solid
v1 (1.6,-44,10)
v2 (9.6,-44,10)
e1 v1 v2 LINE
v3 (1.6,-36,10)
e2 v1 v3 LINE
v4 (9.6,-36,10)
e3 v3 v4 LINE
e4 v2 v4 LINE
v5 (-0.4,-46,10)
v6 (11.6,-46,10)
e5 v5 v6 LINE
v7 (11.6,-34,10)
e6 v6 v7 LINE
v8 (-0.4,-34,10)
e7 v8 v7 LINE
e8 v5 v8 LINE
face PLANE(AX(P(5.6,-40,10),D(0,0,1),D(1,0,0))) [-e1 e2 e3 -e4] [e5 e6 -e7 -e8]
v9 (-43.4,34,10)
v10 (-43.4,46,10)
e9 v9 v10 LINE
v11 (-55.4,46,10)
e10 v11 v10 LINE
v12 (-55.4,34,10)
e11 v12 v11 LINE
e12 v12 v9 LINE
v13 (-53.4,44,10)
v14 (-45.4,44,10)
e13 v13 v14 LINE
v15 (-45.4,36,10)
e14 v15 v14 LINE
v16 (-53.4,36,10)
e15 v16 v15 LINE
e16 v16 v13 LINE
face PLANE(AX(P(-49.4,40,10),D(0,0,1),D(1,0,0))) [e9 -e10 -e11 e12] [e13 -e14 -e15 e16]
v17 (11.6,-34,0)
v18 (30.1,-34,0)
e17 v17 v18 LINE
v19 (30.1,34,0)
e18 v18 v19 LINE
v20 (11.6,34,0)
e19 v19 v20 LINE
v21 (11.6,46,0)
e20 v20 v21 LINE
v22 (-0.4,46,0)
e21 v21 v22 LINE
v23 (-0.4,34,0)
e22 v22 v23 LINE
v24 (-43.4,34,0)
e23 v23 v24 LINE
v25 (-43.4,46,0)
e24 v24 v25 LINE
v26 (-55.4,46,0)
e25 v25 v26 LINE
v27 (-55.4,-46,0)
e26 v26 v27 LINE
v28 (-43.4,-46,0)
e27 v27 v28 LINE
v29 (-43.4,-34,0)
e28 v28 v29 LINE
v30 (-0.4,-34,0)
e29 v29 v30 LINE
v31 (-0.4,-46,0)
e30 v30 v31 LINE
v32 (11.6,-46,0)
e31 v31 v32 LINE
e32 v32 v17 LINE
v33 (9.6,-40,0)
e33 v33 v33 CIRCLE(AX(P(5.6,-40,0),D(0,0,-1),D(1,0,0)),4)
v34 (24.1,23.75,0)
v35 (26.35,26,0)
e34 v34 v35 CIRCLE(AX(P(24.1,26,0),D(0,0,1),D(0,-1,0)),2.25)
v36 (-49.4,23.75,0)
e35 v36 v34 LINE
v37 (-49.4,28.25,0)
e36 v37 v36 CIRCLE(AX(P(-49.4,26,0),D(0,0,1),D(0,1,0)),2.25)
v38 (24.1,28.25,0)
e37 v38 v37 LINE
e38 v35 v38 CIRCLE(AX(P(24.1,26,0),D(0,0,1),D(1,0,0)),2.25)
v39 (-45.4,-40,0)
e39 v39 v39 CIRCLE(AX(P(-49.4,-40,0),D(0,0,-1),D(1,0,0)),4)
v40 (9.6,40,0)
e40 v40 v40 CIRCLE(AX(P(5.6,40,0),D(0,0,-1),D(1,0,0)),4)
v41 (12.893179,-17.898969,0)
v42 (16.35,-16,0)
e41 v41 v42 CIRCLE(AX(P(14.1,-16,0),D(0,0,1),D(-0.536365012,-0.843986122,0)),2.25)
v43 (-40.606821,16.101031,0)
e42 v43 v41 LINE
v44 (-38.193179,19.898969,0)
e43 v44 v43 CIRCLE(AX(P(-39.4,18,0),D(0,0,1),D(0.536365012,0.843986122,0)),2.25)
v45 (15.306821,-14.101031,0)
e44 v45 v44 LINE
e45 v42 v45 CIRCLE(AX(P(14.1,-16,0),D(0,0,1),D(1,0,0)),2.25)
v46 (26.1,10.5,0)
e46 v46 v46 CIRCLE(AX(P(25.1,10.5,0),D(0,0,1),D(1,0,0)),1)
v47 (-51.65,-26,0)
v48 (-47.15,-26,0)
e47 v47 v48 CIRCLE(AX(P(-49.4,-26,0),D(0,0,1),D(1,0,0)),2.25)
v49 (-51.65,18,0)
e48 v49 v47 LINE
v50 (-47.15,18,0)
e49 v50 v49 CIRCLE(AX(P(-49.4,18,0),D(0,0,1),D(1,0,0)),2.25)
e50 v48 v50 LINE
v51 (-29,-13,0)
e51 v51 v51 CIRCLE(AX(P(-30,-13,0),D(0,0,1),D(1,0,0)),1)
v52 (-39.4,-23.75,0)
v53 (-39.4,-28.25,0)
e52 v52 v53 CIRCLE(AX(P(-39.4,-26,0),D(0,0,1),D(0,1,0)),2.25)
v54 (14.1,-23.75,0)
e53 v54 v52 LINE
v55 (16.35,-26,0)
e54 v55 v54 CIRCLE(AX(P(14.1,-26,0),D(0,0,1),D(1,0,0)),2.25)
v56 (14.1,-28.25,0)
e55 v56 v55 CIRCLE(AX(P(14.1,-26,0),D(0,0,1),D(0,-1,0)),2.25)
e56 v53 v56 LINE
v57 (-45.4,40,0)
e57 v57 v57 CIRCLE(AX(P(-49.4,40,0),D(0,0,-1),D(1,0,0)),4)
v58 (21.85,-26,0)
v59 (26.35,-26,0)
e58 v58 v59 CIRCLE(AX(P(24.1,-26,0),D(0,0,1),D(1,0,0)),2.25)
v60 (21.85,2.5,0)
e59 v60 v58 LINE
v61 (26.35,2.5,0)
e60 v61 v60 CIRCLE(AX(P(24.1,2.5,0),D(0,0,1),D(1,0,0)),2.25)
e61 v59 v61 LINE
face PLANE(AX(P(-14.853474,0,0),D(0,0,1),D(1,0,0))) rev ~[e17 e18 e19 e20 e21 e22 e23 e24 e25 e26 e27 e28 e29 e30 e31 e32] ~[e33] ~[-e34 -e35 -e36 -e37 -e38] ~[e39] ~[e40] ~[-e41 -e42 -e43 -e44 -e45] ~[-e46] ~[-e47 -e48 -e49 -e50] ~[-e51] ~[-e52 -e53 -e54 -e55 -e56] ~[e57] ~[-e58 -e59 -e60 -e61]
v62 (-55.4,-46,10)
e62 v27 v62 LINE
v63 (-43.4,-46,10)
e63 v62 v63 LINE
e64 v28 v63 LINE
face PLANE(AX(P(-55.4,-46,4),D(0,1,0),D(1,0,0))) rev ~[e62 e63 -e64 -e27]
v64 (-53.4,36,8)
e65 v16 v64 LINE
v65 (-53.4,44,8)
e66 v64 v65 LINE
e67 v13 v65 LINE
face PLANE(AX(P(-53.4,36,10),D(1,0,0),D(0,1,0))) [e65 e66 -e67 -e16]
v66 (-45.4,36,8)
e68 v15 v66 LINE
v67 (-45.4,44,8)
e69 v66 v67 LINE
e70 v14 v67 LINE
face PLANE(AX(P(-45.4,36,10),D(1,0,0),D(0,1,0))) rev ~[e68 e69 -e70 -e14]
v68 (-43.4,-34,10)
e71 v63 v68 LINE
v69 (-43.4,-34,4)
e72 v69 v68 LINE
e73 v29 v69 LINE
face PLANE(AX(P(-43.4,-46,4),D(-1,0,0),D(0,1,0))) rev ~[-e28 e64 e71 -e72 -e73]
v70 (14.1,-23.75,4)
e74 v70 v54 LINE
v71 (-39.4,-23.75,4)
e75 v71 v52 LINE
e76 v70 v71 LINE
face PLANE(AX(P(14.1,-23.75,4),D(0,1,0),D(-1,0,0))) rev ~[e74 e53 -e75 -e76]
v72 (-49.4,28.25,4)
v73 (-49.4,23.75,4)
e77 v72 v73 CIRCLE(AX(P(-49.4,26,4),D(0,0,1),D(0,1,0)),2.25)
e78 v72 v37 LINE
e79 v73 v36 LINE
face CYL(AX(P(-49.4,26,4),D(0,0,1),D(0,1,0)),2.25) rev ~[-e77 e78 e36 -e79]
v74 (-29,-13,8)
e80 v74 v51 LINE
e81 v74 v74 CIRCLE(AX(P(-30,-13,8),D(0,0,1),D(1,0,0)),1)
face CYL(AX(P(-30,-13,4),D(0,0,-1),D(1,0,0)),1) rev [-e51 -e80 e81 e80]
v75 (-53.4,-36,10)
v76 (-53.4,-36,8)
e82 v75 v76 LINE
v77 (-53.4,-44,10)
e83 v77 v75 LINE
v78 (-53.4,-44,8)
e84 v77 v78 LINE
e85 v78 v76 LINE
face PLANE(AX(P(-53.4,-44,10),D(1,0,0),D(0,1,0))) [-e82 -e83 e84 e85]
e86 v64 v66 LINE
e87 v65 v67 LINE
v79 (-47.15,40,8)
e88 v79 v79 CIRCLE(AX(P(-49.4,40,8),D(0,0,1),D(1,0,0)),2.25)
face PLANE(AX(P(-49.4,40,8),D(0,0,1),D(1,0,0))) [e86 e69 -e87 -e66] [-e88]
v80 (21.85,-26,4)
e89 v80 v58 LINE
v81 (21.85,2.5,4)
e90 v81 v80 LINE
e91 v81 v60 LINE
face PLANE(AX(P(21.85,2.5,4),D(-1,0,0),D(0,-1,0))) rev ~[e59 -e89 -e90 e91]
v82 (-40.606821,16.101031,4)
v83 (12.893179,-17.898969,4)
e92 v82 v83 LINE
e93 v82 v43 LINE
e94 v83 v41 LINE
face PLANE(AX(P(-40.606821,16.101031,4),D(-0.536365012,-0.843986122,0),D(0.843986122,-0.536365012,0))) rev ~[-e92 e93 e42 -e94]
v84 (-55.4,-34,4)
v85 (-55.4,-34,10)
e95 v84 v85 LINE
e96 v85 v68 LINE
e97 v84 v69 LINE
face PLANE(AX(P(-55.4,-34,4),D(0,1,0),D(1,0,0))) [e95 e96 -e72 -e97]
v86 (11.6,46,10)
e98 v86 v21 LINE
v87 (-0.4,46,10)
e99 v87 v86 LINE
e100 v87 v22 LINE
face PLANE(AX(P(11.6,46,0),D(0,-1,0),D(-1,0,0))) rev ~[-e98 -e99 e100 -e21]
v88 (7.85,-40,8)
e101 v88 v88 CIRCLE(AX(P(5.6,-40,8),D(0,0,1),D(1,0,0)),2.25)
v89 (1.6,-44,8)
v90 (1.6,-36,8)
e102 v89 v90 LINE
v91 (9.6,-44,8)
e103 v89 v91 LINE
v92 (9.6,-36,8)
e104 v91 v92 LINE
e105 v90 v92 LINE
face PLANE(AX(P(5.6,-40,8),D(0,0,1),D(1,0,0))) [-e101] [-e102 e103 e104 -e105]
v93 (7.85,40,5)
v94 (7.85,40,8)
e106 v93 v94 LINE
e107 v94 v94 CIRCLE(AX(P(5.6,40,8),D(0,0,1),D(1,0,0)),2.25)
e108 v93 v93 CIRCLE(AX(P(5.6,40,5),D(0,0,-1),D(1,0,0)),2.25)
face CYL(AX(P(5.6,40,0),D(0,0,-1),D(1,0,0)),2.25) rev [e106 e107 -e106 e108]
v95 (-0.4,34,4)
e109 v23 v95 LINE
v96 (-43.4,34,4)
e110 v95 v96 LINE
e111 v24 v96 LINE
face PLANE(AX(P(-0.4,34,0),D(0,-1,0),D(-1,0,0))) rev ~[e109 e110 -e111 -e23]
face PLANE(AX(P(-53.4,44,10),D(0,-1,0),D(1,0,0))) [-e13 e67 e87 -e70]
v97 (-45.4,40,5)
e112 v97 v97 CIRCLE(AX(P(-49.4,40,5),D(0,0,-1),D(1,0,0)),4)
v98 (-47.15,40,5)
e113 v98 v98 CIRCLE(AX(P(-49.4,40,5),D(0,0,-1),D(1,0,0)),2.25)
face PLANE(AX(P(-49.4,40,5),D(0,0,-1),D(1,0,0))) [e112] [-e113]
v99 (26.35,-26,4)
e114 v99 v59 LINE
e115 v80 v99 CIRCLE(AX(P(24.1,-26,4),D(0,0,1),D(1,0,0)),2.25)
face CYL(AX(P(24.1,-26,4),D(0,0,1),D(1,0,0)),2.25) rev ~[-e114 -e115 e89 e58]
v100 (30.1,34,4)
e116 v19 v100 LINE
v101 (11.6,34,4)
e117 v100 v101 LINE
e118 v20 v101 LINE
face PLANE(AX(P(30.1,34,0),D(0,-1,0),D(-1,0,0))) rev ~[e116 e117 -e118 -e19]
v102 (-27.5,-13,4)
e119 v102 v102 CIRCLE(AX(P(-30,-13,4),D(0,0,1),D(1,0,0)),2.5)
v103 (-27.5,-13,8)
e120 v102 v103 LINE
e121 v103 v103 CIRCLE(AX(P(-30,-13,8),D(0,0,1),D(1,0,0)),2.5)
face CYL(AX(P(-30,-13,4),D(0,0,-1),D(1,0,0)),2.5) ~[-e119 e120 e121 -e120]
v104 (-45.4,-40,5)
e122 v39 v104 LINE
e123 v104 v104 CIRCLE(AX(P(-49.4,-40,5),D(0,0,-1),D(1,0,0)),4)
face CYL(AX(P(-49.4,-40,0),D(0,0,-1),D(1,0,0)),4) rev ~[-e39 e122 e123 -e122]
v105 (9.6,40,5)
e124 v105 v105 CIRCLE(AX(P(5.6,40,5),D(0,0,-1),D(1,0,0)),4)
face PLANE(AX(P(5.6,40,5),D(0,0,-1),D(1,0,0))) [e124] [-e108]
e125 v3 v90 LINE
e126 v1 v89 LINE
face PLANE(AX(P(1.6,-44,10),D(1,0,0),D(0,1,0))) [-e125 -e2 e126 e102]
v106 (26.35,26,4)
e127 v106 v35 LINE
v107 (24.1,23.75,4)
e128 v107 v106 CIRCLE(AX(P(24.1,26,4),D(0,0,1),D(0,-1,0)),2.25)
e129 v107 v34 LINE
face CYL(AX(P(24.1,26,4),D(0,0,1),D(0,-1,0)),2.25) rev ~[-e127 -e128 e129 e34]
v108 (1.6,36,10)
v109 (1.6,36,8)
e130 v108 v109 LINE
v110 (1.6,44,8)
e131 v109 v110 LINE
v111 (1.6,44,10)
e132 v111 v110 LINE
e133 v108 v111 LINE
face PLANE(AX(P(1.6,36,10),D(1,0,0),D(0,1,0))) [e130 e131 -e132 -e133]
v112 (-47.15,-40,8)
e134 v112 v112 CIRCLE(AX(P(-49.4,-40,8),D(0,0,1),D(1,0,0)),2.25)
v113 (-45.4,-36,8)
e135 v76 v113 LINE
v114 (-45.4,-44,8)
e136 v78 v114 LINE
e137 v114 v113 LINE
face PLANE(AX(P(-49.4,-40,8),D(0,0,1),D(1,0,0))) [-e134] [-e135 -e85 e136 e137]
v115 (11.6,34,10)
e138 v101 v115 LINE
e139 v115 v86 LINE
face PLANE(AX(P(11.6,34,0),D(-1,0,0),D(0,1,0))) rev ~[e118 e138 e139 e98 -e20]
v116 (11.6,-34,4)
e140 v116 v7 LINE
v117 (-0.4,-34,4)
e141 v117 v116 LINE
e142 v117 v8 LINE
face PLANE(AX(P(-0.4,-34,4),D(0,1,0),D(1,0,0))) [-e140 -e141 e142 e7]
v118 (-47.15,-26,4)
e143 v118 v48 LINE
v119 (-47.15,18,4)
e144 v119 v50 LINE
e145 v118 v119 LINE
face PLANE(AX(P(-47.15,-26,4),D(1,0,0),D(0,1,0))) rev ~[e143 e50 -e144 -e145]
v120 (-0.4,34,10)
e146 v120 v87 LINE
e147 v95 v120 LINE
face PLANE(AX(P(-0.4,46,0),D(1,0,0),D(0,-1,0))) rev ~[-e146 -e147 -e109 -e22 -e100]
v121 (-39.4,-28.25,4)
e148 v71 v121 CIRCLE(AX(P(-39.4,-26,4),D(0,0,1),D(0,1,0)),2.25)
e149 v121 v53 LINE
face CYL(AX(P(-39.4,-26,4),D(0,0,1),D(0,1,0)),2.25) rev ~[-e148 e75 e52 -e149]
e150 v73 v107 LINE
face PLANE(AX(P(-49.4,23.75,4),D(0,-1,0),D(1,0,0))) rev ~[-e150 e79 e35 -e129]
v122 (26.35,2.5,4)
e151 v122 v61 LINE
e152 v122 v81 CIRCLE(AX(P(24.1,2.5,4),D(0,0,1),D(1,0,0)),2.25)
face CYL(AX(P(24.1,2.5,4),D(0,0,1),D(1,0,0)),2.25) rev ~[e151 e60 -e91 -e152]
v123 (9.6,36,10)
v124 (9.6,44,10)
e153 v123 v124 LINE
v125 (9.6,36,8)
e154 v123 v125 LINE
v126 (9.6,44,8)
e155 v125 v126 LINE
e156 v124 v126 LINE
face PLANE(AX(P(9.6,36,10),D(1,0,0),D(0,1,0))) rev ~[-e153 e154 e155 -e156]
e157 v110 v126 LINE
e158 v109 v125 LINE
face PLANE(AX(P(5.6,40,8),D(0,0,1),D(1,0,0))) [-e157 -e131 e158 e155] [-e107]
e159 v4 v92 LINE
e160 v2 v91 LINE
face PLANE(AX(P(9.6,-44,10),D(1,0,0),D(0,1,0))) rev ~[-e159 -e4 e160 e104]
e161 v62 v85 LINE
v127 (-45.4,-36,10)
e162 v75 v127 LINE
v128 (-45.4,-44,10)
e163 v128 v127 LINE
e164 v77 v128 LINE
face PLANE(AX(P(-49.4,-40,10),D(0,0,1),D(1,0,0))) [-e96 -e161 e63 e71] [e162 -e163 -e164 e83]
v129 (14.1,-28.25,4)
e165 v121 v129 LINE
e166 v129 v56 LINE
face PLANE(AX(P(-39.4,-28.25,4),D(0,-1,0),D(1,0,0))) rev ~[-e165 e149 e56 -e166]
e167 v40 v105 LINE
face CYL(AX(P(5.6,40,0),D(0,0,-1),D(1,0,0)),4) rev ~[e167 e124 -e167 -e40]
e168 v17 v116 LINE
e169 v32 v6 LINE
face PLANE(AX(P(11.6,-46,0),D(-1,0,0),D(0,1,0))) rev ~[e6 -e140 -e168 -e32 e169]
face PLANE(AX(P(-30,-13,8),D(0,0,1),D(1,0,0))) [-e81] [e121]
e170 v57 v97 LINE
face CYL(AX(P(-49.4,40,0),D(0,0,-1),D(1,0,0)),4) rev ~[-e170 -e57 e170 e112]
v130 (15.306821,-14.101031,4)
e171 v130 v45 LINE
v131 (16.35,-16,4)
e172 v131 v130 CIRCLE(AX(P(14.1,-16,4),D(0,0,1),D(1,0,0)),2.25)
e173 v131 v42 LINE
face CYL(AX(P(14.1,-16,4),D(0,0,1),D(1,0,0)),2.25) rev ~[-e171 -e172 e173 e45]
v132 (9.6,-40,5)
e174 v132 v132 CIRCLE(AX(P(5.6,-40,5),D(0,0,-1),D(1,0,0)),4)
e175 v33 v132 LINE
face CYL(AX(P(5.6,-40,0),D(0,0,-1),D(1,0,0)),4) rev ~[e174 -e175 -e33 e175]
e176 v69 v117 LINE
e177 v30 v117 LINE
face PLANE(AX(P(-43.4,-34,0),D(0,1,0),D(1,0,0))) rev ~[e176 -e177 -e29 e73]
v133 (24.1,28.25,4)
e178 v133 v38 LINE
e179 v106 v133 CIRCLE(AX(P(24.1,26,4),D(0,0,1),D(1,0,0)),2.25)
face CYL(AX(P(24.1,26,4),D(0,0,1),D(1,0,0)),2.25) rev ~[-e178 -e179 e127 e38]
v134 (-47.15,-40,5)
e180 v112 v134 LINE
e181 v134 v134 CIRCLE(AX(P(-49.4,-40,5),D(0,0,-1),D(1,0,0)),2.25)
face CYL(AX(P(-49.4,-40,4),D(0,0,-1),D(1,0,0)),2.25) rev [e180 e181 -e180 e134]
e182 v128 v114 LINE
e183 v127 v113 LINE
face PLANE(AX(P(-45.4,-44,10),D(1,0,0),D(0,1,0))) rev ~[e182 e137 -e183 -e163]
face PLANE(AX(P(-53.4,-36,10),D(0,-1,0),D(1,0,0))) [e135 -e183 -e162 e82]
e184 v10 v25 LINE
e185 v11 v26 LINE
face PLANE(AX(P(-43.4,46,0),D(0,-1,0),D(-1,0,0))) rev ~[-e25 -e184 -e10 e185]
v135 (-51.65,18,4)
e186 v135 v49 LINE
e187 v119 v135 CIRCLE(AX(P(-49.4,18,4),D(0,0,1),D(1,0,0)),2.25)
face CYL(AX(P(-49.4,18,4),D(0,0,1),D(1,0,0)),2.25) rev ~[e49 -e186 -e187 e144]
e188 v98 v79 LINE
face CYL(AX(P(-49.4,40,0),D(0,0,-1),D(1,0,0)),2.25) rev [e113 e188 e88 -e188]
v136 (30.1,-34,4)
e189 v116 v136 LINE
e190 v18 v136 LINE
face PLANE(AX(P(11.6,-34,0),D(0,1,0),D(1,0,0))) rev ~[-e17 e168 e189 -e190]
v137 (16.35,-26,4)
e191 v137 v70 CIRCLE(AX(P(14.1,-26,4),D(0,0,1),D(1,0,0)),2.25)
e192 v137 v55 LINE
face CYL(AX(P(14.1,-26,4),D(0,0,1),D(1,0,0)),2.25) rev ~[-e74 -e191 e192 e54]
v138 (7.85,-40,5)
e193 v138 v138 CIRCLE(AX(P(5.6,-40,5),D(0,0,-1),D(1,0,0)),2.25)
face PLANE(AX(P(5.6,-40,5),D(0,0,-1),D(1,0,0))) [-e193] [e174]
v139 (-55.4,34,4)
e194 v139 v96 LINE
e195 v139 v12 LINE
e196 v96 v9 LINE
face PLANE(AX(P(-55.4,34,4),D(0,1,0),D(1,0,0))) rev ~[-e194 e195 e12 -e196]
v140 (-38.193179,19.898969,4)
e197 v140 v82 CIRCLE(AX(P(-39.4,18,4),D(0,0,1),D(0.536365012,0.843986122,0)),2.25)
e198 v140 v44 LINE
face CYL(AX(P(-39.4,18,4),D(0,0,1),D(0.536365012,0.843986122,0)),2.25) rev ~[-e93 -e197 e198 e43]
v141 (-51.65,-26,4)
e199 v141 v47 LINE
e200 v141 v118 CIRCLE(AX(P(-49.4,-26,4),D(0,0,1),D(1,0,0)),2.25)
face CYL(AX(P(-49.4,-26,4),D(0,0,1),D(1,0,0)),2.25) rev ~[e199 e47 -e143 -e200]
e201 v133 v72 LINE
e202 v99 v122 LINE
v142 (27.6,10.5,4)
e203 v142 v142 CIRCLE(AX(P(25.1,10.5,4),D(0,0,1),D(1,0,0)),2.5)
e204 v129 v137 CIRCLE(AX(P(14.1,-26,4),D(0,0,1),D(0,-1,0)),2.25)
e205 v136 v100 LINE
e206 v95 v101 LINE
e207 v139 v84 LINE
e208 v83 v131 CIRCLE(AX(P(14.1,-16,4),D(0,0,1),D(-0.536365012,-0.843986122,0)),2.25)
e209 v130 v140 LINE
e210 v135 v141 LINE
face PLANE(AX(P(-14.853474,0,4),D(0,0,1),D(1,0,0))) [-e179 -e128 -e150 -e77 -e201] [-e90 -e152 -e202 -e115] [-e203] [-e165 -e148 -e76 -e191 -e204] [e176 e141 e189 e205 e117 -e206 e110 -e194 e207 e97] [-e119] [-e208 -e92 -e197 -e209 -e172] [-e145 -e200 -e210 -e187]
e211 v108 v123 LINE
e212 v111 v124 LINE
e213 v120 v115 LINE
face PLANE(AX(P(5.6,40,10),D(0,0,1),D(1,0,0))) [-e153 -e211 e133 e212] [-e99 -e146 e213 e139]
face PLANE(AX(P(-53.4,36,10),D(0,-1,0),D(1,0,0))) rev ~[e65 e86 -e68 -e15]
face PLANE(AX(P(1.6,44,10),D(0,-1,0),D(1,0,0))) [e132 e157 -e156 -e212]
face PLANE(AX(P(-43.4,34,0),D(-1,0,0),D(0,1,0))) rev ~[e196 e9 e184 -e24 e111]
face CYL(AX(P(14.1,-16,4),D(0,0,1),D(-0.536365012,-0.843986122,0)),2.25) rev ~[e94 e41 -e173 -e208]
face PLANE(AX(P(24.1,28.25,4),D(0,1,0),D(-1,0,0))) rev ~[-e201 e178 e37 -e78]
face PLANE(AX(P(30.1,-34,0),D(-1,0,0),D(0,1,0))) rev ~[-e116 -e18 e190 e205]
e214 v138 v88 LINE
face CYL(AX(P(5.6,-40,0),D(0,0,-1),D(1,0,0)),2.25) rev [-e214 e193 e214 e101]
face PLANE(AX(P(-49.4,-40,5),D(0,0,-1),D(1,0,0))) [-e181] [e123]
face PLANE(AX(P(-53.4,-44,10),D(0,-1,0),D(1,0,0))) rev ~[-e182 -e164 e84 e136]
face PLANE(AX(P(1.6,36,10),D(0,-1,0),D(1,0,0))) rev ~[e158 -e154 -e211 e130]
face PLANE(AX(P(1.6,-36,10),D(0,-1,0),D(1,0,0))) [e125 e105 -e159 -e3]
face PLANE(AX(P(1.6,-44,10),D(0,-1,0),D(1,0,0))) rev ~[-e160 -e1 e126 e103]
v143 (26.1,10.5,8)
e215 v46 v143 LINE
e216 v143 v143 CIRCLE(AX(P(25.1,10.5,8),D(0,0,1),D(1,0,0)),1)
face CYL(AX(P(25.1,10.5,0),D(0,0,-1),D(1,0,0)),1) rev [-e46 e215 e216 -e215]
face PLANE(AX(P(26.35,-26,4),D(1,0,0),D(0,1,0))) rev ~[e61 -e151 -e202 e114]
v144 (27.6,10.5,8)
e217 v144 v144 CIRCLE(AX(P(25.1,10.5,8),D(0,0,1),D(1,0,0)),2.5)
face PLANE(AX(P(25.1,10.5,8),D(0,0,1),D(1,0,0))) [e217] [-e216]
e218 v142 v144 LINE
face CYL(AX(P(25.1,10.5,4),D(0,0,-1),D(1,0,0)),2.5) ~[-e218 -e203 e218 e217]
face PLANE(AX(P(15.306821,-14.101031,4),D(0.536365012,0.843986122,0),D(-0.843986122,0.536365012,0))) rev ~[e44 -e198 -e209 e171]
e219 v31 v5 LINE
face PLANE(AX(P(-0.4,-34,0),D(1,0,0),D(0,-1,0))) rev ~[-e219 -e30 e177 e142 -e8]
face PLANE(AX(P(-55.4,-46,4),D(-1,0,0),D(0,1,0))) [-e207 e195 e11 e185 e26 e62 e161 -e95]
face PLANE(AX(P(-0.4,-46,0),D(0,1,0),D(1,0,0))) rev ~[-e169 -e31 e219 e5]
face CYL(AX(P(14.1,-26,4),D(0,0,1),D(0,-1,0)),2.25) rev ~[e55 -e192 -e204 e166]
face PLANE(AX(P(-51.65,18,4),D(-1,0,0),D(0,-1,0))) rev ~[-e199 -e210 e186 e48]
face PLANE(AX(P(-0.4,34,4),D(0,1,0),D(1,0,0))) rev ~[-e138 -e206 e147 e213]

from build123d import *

# Parameters (mm, degrees)
F0_R      = 2.25
F0_R_2    = 1
F1_DEPTH  = 4
F2_W      = 12
F2_H      = 12
F2_R      = 2.25
F3_DEPTH  = 6
F4_W      = 8
F4_H      = 8
F4_R      = 2.25
F5_DEPTH  = 2
F6_R      = 4
F6_R_2    = 2.25
F7_DEPTH  = 5
F8_R      = 2.5
F8_R_2    = 1
F9_DEPTH  = 4
F11_DEPTH = 4.001


# Not quite as in the source:
# - a feature names something its author has since deleted; it is built from what else it names


with BuildPart() as f1:
    # F0 (on Top) → F1 (new body)
    with BuildSketch(Plane.XY):
        Polygon((-43.4, 46), (-55.4, 46), (-55.4, -46), (-43.4, -46), (-43.4, -34), (-0.4, -34), (-0.4, -46), (11.6, -46), (11.6, -34), (30.1, -34), (30.1, 34), (11.6, 34), (11.6, 46), (-0.4, 46), (-0.4, 34), (-43.4, 34), align=None)
        with Locations((-49.4, -40)):
            Circle(F0_R, mode=Mode.SUBTRACT)
        with Locations((-30, -13)):
            Circle(F0_R_2, mode=Mode.SUBTRACT)
        with Locations((5.6, -40)):
            Circle(F0_R, mode=Mode.SUBTRACT)
        with Locations((-49.4, 40)):
            Circle(F0_R, mode=Mode.SUBTRACT)
        with Locations((25.1, 10.5)):
            Circle(F0_R_2, mode=Mode.SUBTRACT)
        with Locations((5.6, 40)):
            Circle(F0_R, mode=Mode.SUBTRACT)
    extrude(amount=F1_DEPTH)

    # F2 (on face) → F3 (join)
    with BuildSketch(Plane.XY.offset(4)):
        with Locations((-49.4, -40)):
            Rectangle(F2_W, F2_H)
        with Locations((-49.4, -40)):
            Circle(F2_R, mode=Mode.SUBTRACT)
        with Locations((-49.4, 40)):
            Rectangle(F2_W, F2_H)
        with Locations((-49.4, 40)):
            Circle(F2_R, mode=Mode.SUBTRACT)
        with Locations((5.6, 40)):
            Rectangle(F2_W, F2_H)
        with Locations((5.6, 40)):
            Circle(F2_R, mode=Mode.SUBTRACT)
        with Locations((5.6, -40)):
            Rectangle(F2_W, F2_H)
        with Locations((5.6, -40)):
            Circle(F2_R, mode=Mode.SUBTRACT)
    extrude(amount=F3_DEPTH)

    # F4 (on face) → F5 (cut)
    with BuildSketch(Plane.XY.offset(10)):
        with Locations((-49.4, 40)):
            Rectangle(F4_W, F4_H)
        with Locations((-49.4, 40)):
            Circle(F4_R, mode=Mode.SUBTRACT)
        with Locations((5.6, 40)):
            Rectangle(F4_W, F4_H)
        with Locations((5.6, 40)):
            Circle(F4_R, mode=Mode.SUBTRACT)
        with Locations((5.6, -40)):
            Rectangle(F4_W, F4_H)
        with Locations((5.6, -40)):
            Circle(F4_R, mode=Mode.SUBTRACT)
        with Locations((-49.4, -40)):
            Rectangle(F4_W, F4_H)
        with Locations((-49.4, -40)):
            Circle(F4_R, mode=Mode.SUBTRACT)
    extrude(amount=-F5_DEPTH, mode=Mode.SUBTRACT)

    # F6 (on face) → F7 (cut)
    with BuildSketch(Plane(origin=(0, 0, 0), x_dir=(1, 0, 0), z_dir=(0, 0, -1))):
        with Locations((-49.4, 40)):
            Circle(F6_R)
        with Locations((-49.4, 40)):
            Circle(F6_R_2, mode=Mode.SUBTRACT)
        with Locations((5.6, 40)):
            Circle(F6_R)
        with Locations((5.6, 40)):
            Circle(F6_R_2, mode=Mode.SUBTRACT)
        with Locations((5.6, -40)):
            Circle(F6_R)
        with Locations((5.6, -40)):
            Circle(F6_R_2, mode=Mode.SUBTRACT)
        with Locations((-49.4, -40)):
            Circle(F6_R)
        with Locations((-49.4, -40)):
            Circle(F6_R_2, mode=Mode.SUBTRACT)
    extrude(amount=-F7_DEPTH, mode=Mode.SUBTRACT)

    # F8 (on face) → F9 (join)
    with BuildSketch(Plane.XY.offset(4)):
        with Locations((-30, -13)):
            Circle(F8_R)
        with Locations((-30, -13)):
            Circle(F8_R_2, mode=Mode.SUBTRACT)
        with Locations((25.1, 10.5)):
            Circle(F8_R)
        with Locations((25.1, 10.5)):
            Circle(F8_R_2, mode=Mode.SUBTRACT)
    extrude(amount=F9_DEPTH)

    # F10 (on face) → F11 (cut, through all)
    with BuildSketch(Plane.XY.offset(4)):
        with BuildLine():
            ThreePointArc((-49.4, 28.25), (-47.8090097423, 27.5909902577), (-47.15, 26))
            ThreePointArc((-47.15, 26), (-47.8090097423, 24.4090097423), (-49.4, 23.75))
            Line((-49.4, 23.75), (24.1, 23.75))
            ThreePointArc((24.1, 23.75), (21.85, 26), (24.1, 28.25))
            Line((24.1, 28.25), (-49.4, 28.25))
        make_face()
        with BuildLine():
            ThreePointArc((-49.4, 23.75), (-47.8090097423, 24.4090097423), (-47.15, 26))
            ThreePointArc((-47.15, 26), (-47.8090097423, 27.5909902577), (-49.4, 28.25))
            ThreePointArc((-49.4, 28.25), (-51.65, 26), (-49.4, 23.75))
        make_face()
        with BuildLine():
            Line((-47.15, -26), (-47.15, 18))
            ThreePointArc((-47.15, 18), (-49.4, 15.75), (-51.65, 18))
            Line((-51.65, 18), (-51.65, -26))
            ThreePointArc((-51.65, -26), (-49.4, -23.75), (-47.15, -26))
        make_face()
        with BuildLine():
            ThreePointArc((-51.65, 18), (-49.4, 15.75), (-47.15, 18))
            ThreePointArc((-47.15, 18), (-49.4, 20.25), (-51.65, 18))
        make_face()
        with BuildLine():
            ThreePointArc((-40.606821277, 16.1010312258), (-38.3166828427, 16.0279645194), (-37.15, 18))
            ThreePointArc((-37.15, 18), (-37.4279645194, 19.0833171573), (-38.193178723, 19.8989687742))
            ThreePointArc((-38.193178723, 19.8989687742), (-41.2989687742, 19.206821277), (-40.606821277, 16.1010312258))
        make_face()
        with BuildLine():
            ThreePointArc((-51.65, -26), (-49.4, -28.25), (-47.15, -26))
            ThreePointArc((-47.15, -26), (-49.4, -23.75), (-51.65, -26))
        make_face()
        with BuildLine():
            ThreePointArc((-39.4, -28.25), (-37.8090097423, -27.5909902577), (-37.15, -26))
            ThreePointArc((-37.15, -26), (-37.8090097423, -24.4090097423), (-39.4, -23.75))
            ThreePointArc((-39.4, -23.75), (-41.65, -26), (-39.4, -28.25))
        make_face()
        with BuildLine():
            ThreePointArc((-39.4, -23.75), (-37.8090097423, -24.4090097423), (-37.15, -26))
            ThreePointArc((-37.15, -26), (-37.8090097423, -27.5909902577), (-39.4, -28.25))
            Line((-39.4, -28.25), (14.1, -28.25))
            ThreePointArc((14.1, -28.25), (11.85, -26), (14.1, -23.75))
            Line((14.1, -23.75), (-39.4, -23.75))
        make_face()
        with BuildLine():
            ThreePointArc((16.35, -26), (15.6909902577, -24.4090097423), (14.1, -23.75))
            ThreePointArc((14.1, -23.75), (11.85, -26), (14.1, -28.25))
            ThreePointArc((14.1, -28.25), (15.6909902577, -27.5909902577), (16.35, -26))
        make_face()
        with BuildLine():
            ThreePointArc((21.85, -26), (24.1, -28.25), (26.35, -26))
            ThreePointArc((26.35, -26), (24.1, -23.75), (21.85, -26))
        make_face()
        with BuildLine():
            ThreePointArc((16.35, -16), (16.0720354806, -14.9166828427), (15.306821277, -14.1010312258))
            ThreePointArc((15.306821277, -14.1010312258), (12.2010312258, -14.793178723), (12.893178723, -17.8989687742))
            ThreePointArc((12.893178723, -17.8989687742), (15.1833171573, -17.9720354806), (16.35, -16))
        make_face()
        with BuildLine():
            ThreePointArc((-38.193178723, 19.8989687742), (-37.4279645194, 19.0833171573), (-37.15, 18))
            ThreePointArc((-37.15, 18), (-38.3166828427, 16.0279645194), (-40.606821277, 16.1010312258))
            Line((-40.606821277, 16.1010312258), (12.893178723, -17.8989687742))
            ThreePointArc((12.893178723, -17.8989687742), (12.2010312258, -14.793178723), (15.306821277, -14.1010312258))
            Line((15.306821277, -14.1010312258), (-38.193178723, 19.8989687742))
        make_face()
        with BuildLine():
            ThreePointArc((21.85, -26), (24.1, -23.75), (26.35, -26))
            Line((26.35, -26), (26.35, 2.5))
            ThreePointArc((26.35, 2.5), (24.1, 0.25), (21.85, 2.5))
            Line((21.85, 2.5), (21.85, -26))
        make_face()
        with BuildLine():
            ThreePointArc((21.85, 2.5), (24.1, 0.25), (26.35, 2.5))
            ThreePointArc((26.35, 2.5), (24.1, 4.75), (21.85, 2.5))
        make_face()
        with BuildLine():
            ThreePointArc((26.35, 26), (25.6909902577, 27.5909902577), (24.1, 28.25))
            ThreePointArc((24.1, 28.25), (21.85, 26), (24.1, 23.75))
            ThreePointArc((24.1, 23.75), (25.6909902577, 24.4090097423), (26.35, 26))
        make_face()
    extrude(amount=-F11_DEPTH, mode=Mode.SUBTRACT)


solid = f1.part
